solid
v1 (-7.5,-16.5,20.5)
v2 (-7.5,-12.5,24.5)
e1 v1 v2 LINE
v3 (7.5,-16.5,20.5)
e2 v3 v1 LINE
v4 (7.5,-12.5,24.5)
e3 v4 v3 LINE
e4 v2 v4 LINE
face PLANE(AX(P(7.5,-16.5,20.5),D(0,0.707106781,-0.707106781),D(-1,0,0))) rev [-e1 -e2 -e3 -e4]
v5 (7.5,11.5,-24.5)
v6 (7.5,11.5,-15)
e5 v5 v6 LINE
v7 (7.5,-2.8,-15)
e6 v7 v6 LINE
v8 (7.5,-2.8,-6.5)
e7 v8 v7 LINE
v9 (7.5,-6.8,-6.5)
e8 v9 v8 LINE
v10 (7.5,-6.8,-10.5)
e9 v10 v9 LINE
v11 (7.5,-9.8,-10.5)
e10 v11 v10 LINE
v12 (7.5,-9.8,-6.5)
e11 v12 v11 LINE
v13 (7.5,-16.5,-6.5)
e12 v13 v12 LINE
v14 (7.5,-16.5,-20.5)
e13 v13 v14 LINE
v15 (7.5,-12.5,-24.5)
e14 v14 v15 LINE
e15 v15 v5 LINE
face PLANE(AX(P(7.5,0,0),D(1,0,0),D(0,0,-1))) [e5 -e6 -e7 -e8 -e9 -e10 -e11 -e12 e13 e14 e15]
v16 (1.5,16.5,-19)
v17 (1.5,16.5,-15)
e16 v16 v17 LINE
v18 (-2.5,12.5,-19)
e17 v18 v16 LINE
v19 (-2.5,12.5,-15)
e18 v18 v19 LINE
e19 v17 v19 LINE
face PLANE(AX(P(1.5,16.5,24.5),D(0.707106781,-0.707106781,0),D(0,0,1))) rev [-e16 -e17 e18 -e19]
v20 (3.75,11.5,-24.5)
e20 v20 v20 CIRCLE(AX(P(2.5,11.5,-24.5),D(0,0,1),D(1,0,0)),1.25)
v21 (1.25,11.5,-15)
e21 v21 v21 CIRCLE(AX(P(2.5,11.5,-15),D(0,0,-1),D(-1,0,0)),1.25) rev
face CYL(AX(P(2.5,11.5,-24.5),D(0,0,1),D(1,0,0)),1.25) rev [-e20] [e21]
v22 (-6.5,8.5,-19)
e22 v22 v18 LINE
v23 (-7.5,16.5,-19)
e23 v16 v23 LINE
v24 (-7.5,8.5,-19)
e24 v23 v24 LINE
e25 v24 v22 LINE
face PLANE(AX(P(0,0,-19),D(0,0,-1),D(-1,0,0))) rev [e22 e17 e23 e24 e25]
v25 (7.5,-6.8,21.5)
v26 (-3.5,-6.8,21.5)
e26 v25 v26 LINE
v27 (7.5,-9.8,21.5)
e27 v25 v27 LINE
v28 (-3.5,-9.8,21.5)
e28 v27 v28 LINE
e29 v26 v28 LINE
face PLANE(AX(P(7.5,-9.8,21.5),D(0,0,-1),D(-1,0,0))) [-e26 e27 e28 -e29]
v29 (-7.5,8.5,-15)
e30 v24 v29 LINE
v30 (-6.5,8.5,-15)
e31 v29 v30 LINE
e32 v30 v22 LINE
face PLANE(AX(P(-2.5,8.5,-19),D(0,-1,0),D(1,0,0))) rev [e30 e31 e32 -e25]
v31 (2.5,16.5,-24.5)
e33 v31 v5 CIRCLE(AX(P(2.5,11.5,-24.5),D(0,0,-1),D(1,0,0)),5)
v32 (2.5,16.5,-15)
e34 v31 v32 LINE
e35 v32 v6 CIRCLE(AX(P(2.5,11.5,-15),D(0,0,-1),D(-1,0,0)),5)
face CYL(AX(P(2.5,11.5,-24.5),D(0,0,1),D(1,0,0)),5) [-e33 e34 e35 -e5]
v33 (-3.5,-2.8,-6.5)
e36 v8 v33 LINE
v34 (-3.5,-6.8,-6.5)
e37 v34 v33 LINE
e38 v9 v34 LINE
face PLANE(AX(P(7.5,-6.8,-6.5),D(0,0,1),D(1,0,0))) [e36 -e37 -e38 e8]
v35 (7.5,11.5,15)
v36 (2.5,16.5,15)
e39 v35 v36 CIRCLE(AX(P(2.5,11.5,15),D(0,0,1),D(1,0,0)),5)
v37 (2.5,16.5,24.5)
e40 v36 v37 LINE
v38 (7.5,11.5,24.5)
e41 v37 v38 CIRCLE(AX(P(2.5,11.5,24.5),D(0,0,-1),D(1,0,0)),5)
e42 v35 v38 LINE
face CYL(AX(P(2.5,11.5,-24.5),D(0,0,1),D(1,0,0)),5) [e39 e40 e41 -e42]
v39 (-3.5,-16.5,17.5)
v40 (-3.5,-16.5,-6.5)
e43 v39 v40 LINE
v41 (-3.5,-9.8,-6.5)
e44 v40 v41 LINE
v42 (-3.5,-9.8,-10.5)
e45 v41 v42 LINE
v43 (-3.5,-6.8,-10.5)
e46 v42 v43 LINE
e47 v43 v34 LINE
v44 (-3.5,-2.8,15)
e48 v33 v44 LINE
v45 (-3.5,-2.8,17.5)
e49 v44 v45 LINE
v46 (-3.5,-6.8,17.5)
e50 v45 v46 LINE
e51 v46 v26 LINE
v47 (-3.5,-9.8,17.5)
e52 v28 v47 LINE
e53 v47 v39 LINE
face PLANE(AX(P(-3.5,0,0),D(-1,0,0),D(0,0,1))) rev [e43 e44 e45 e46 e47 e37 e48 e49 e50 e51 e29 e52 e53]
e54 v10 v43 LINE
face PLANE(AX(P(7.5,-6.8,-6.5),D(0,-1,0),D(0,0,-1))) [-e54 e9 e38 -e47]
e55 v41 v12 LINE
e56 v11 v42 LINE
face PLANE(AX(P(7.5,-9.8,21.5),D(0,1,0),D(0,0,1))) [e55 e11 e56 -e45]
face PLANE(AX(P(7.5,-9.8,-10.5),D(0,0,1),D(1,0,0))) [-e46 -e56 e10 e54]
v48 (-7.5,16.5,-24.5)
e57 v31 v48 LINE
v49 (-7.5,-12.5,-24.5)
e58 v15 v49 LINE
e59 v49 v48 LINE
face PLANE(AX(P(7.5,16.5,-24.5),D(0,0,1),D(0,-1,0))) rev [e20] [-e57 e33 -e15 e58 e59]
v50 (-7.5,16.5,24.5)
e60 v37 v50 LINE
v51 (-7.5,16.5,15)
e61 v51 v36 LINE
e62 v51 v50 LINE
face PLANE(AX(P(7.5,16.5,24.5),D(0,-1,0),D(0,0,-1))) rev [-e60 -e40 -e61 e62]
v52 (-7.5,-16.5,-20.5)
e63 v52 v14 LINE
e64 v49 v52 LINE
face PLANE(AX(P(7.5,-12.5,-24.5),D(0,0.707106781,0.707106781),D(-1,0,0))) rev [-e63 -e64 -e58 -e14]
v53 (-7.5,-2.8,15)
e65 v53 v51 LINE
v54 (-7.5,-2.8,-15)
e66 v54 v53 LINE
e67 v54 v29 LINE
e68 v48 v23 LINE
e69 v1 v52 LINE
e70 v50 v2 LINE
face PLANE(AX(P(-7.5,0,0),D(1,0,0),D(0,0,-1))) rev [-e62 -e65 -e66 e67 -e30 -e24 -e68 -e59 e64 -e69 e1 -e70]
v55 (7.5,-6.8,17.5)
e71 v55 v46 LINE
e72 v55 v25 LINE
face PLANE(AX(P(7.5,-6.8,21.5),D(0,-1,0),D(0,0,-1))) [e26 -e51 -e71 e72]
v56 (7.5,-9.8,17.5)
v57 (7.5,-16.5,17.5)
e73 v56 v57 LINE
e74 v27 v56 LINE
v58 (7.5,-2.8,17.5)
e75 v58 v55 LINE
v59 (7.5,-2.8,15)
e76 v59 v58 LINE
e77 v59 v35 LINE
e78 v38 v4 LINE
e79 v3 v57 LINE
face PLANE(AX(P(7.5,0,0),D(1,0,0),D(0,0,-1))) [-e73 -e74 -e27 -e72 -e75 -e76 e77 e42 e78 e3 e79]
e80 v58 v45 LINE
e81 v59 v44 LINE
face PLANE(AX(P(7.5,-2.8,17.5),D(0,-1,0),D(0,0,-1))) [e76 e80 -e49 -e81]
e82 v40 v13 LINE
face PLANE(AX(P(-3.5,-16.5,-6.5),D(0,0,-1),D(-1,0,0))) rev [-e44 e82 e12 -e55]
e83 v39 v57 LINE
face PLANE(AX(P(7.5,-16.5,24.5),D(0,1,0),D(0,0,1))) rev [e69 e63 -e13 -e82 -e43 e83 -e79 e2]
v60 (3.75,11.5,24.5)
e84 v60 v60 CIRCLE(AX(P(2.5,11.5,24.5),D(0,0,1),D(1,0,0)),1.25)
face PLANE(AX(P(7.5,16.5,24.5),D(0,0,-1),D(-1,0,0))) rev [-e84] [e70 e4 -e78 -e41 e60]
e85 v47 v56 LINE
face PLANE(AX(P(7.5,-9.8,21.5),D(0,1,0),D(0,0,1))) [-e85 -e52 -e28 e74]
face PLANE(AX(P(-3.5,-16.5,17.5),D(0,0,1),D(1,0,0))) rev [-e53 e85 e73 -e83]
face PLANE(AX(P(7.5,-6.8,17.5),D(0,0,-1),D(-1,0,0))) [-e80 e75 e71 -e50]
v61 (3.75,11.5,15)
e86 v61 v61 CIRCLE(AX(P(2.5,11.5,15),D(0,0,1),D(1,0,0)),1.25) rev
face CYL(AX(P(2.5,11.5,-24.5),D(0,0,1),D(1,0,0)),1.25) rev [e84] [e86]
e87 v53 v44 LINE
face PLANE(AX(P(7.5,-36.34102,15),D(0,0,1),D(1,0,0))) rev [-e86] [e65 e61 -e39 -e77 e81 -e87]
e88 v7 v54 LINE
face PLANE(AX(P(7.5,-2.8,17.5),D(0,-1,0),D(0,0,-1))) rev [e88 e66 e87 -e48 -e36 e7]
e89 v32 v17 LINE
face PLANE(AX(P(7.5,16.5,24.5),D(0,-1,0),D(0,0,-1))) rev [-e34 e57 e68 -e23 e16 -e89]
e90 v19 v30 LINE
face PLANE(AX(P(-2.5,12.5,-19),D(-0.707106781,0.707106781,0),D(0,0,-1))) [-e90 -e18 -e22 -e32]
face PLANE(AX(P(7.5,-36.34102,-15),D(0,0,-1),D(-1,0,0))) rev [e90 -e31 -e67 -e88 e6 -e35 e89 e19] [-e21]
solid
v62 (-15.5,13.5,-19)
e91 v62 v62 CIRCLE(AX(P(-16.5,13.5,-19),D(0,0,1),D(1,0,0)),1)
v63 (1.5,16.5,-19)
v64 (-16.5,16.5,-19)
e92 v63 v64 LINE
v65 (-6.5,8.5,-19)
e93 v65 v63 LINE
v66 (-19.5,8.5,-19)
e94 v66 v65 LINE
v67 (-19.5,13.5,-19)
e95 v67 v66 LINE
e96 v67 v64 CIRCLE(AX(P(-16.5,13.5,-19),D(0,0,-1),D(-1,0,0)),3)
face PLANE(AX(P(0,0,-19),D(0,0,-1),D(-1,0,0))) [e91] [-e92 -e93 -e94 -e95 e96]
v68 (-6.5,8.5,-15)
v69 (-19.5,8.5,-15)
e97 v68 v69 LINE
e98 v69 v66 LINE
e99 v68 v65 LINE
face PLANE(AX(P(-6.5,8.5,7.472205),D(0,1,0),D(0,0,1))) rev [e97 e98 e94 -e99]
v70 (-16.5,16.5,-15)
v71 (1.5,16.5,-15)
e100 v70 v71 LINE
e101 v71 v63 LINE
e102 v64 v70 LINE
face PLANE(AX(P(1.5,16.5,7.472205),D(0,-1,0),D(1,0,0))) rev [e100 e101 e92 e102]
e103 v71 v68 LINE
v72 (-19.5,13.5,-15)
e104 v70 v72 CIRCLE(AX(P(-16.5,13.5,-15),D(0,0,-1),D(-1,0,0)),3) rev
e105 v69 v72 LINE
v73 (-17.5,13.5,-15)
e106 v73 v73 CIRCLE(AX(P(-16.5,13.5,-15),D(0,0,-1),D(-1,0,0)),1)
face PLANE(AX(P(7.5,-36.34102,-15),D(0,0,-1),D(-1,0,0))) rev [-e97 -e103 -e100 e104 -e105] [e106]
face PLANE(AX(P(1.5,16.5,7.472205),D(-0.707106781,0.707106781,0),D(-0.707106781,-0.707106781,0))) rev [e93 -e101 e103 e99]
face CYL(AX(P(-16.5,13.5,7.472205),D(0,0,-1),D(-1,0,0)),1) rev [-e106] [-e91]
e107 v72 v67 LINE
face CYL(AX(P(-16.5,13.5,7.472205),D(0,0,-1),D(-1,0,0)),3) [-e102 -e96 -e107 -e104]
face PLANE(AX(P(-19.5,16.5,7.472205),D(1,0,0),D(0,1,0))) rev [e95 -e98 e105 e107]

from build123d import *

# Parameters (mm, degrees)
SKETCH1_W           = 49
SKETCH1_H           = 33
BOSS_EXTRUDE1_DEPTH = 7.5
SKETCH2_R           = 1.25
CUT_EXTRUDE1_DEPTH  = 53.244616948
SKETCH3_W           = 24
SKETCH3_H           = 6.7
CUT_EXTRUDE2_DEPTH  = 11
CUT_EXTRUDE3_DEPTH  = 32.519835025
CUT_EXTRUDE4_REACH  = 43.779
SKETCH5_W           = 15
SKETCH5_H           = 30
SKETCH6_W           = 5
SKETCH6_H           = 8
CUT_EXTRUDE5_DEPTH  = 4
CHAMFER1_SIZE       = 4
SKETCH7_R           = 1
BOSS_EXTRUDE2_DEPTH = 4
FILLET1_R           = 3
CHAMFER2_SIZE       = 4


with BuildPart() as part:
    # Sketch1 → Boss-Extrude1 (new, symmetric)
    with BuildSketch(Plane(origin=(0, 0, 0), x_dir=(0, 0, -1), z_dir=(1, 0, 0))):
        Rectangle(SKETCH1_W, SKETCH1_H)
    extrude(amount=BOSS_EXTRUDE1_DEPTH, both=True)

    # Sketch2 → Cut-Extrude1 (cut, through all)
    with BuildSketch(Plane.XY.offset(24.5)):
        with Locations((2.5, 11.5)):
            Circle(SKETCH2_R)
        with BuildLine():
            Line((2.5, 16.5), (7.5, 16.5))
            Line((7.5, 16.5), (7.5, 11.5))
            ThreePointArc((7.5, 11.5), (6.035533906, 15.035533906), (2.5, 16.5))
        make_face()
    extrude(amount=-CUT_EXTRUDE1_DEPTH, mode=Mode.SUBTRACT)

    # Sketch3 → Cut-Extrude2 (cut)
    with BuildSketch(Plane(origin=(7.5, 0, 0), x_dir=(0, 0, -1), z_dir=(1, 0, 0))):
        with Locations((-5.5, -13.15)):
            Rectangle(SKETCH3_W, SKETCH3_H)
    extrude(amount=-CUT_EXTRUDE2_DEPTH, mode=Mode.SUBTRACT)

    # Sketch4 → Cut-Extrude3 (cut, through all)
    with BuildSketch(Plane(origin=(-3.5, 0, 0), x_dir=(0, 0, -1), z_dir=(1, 0, 0))):
        Polygon((6.5, -6.8), (10.5, -6.8), (10.5, -9.8), (-21.5, -9.8), (-21.5, -6.8), (-17.5, -6.8), (-17.5, -2.8), (6.5, -2.8), align=None)
    extrude(amount=CUT_EXTRUDE3_DEPTH, mode=Mode.SUBTRACT)

    # Cut-Extrude4: up to this face of the body (flat: up to its plane)
    cut_extrude4_end = Plane(part.part.faces().sort_by_distance((2, -2.8, 5.5))[0])
    # Sketch5 → Cut-Extrude4 (cut, up to the picked face)
    with BuildSketch(Plane(origin=(0, 16.5, 0), x_dir=(1, 0, 0), z_dir=(0, 1, 0)), mode=Mode.PRIVATE) as cut_extrude4_sk1:
        Rectangle(SKETCH5_W, SKETCH5_H)
    cut_extrude4_tool1 = split(extrude(cut_extrude4_sk1.sketch, amount=-CUT_EXTRUDE4_REACH, mode=Mode.PRIVATE), bisect_by=cut_extrude4_end, keep=Keep.BOTH, mode=Mode.PRIVATE)
    add(cut_extrude4_tool1.solids().sort_by(Axis((0, 16.5, 0), (0, -1, 0)))[0], mode=Mode.SUBTRACT)

    # Sketch6 → Cut-Extrude5 (cut)
    with BuildSketch(Plane.XY.offset(-15)):
        with Locations((-5, 12.5)):
            Rectangle(SKETCH6_W, SKETCH6_H)
    extrude(amount=-CUT_EXTRUDE5_DEPTH, mode=Mode.SUBTRACT)

    # Chamfer1
    chamfer1_edges = [part.edges().sort_by_distance(p)[0] for p in [
        (-2.5, 8.5, -17),
    ]]
    chamfer(chamfer1_edges, length=CHAMFER1_SIZE)
    chamfer1_2_edges = [part.edges().sort_by_distance(p)[0] for p in [
        (-2.5, 16.5, -17),
    ]]
    chamfer(chamfer1_2_edges, length=CHAMFER1_SIZE - 0.0001)  # a hair under: the kernel refuses the full size

    # Chamfer2
    chamfer2_edges = [part.edges().sort_by_distance(p)[0] for p in [
        (0, -16.5, -24.5),
        (0, -16.5, 24.5),
    ]]
    chamfer(chamfer2_edges, length=CHAMFER2_SIZE)


with BuildPart() as body_2:
    # Sketch7 → Boss-Extrude2 (new body)
    with BuildSketch(Plane.XY.offset(-19)):
        Polygon((1.5, 16.5), (-19.5, 16.5), (-19.5, 8.5), (-6.5, 8.5), align=None)
        with Locations(Location((-16.5, 13.5, 0), (0, 0, 180))):
            Circle(SKETCH7_R, mode=Mode.SUBTRACT)
    extrude(amount=BOSS_EXTRUDE2_DEPTH)

    # Fillet1
    fillet1_edges = [body_2.edges().sort_by_distance(p)[0] for p in [
        (-19.5, 16.5, -17),
    ]]
    fillet(fillet1_edges, radius=FILLET1_R)


solid = Compound([part.part, body_2.part])
